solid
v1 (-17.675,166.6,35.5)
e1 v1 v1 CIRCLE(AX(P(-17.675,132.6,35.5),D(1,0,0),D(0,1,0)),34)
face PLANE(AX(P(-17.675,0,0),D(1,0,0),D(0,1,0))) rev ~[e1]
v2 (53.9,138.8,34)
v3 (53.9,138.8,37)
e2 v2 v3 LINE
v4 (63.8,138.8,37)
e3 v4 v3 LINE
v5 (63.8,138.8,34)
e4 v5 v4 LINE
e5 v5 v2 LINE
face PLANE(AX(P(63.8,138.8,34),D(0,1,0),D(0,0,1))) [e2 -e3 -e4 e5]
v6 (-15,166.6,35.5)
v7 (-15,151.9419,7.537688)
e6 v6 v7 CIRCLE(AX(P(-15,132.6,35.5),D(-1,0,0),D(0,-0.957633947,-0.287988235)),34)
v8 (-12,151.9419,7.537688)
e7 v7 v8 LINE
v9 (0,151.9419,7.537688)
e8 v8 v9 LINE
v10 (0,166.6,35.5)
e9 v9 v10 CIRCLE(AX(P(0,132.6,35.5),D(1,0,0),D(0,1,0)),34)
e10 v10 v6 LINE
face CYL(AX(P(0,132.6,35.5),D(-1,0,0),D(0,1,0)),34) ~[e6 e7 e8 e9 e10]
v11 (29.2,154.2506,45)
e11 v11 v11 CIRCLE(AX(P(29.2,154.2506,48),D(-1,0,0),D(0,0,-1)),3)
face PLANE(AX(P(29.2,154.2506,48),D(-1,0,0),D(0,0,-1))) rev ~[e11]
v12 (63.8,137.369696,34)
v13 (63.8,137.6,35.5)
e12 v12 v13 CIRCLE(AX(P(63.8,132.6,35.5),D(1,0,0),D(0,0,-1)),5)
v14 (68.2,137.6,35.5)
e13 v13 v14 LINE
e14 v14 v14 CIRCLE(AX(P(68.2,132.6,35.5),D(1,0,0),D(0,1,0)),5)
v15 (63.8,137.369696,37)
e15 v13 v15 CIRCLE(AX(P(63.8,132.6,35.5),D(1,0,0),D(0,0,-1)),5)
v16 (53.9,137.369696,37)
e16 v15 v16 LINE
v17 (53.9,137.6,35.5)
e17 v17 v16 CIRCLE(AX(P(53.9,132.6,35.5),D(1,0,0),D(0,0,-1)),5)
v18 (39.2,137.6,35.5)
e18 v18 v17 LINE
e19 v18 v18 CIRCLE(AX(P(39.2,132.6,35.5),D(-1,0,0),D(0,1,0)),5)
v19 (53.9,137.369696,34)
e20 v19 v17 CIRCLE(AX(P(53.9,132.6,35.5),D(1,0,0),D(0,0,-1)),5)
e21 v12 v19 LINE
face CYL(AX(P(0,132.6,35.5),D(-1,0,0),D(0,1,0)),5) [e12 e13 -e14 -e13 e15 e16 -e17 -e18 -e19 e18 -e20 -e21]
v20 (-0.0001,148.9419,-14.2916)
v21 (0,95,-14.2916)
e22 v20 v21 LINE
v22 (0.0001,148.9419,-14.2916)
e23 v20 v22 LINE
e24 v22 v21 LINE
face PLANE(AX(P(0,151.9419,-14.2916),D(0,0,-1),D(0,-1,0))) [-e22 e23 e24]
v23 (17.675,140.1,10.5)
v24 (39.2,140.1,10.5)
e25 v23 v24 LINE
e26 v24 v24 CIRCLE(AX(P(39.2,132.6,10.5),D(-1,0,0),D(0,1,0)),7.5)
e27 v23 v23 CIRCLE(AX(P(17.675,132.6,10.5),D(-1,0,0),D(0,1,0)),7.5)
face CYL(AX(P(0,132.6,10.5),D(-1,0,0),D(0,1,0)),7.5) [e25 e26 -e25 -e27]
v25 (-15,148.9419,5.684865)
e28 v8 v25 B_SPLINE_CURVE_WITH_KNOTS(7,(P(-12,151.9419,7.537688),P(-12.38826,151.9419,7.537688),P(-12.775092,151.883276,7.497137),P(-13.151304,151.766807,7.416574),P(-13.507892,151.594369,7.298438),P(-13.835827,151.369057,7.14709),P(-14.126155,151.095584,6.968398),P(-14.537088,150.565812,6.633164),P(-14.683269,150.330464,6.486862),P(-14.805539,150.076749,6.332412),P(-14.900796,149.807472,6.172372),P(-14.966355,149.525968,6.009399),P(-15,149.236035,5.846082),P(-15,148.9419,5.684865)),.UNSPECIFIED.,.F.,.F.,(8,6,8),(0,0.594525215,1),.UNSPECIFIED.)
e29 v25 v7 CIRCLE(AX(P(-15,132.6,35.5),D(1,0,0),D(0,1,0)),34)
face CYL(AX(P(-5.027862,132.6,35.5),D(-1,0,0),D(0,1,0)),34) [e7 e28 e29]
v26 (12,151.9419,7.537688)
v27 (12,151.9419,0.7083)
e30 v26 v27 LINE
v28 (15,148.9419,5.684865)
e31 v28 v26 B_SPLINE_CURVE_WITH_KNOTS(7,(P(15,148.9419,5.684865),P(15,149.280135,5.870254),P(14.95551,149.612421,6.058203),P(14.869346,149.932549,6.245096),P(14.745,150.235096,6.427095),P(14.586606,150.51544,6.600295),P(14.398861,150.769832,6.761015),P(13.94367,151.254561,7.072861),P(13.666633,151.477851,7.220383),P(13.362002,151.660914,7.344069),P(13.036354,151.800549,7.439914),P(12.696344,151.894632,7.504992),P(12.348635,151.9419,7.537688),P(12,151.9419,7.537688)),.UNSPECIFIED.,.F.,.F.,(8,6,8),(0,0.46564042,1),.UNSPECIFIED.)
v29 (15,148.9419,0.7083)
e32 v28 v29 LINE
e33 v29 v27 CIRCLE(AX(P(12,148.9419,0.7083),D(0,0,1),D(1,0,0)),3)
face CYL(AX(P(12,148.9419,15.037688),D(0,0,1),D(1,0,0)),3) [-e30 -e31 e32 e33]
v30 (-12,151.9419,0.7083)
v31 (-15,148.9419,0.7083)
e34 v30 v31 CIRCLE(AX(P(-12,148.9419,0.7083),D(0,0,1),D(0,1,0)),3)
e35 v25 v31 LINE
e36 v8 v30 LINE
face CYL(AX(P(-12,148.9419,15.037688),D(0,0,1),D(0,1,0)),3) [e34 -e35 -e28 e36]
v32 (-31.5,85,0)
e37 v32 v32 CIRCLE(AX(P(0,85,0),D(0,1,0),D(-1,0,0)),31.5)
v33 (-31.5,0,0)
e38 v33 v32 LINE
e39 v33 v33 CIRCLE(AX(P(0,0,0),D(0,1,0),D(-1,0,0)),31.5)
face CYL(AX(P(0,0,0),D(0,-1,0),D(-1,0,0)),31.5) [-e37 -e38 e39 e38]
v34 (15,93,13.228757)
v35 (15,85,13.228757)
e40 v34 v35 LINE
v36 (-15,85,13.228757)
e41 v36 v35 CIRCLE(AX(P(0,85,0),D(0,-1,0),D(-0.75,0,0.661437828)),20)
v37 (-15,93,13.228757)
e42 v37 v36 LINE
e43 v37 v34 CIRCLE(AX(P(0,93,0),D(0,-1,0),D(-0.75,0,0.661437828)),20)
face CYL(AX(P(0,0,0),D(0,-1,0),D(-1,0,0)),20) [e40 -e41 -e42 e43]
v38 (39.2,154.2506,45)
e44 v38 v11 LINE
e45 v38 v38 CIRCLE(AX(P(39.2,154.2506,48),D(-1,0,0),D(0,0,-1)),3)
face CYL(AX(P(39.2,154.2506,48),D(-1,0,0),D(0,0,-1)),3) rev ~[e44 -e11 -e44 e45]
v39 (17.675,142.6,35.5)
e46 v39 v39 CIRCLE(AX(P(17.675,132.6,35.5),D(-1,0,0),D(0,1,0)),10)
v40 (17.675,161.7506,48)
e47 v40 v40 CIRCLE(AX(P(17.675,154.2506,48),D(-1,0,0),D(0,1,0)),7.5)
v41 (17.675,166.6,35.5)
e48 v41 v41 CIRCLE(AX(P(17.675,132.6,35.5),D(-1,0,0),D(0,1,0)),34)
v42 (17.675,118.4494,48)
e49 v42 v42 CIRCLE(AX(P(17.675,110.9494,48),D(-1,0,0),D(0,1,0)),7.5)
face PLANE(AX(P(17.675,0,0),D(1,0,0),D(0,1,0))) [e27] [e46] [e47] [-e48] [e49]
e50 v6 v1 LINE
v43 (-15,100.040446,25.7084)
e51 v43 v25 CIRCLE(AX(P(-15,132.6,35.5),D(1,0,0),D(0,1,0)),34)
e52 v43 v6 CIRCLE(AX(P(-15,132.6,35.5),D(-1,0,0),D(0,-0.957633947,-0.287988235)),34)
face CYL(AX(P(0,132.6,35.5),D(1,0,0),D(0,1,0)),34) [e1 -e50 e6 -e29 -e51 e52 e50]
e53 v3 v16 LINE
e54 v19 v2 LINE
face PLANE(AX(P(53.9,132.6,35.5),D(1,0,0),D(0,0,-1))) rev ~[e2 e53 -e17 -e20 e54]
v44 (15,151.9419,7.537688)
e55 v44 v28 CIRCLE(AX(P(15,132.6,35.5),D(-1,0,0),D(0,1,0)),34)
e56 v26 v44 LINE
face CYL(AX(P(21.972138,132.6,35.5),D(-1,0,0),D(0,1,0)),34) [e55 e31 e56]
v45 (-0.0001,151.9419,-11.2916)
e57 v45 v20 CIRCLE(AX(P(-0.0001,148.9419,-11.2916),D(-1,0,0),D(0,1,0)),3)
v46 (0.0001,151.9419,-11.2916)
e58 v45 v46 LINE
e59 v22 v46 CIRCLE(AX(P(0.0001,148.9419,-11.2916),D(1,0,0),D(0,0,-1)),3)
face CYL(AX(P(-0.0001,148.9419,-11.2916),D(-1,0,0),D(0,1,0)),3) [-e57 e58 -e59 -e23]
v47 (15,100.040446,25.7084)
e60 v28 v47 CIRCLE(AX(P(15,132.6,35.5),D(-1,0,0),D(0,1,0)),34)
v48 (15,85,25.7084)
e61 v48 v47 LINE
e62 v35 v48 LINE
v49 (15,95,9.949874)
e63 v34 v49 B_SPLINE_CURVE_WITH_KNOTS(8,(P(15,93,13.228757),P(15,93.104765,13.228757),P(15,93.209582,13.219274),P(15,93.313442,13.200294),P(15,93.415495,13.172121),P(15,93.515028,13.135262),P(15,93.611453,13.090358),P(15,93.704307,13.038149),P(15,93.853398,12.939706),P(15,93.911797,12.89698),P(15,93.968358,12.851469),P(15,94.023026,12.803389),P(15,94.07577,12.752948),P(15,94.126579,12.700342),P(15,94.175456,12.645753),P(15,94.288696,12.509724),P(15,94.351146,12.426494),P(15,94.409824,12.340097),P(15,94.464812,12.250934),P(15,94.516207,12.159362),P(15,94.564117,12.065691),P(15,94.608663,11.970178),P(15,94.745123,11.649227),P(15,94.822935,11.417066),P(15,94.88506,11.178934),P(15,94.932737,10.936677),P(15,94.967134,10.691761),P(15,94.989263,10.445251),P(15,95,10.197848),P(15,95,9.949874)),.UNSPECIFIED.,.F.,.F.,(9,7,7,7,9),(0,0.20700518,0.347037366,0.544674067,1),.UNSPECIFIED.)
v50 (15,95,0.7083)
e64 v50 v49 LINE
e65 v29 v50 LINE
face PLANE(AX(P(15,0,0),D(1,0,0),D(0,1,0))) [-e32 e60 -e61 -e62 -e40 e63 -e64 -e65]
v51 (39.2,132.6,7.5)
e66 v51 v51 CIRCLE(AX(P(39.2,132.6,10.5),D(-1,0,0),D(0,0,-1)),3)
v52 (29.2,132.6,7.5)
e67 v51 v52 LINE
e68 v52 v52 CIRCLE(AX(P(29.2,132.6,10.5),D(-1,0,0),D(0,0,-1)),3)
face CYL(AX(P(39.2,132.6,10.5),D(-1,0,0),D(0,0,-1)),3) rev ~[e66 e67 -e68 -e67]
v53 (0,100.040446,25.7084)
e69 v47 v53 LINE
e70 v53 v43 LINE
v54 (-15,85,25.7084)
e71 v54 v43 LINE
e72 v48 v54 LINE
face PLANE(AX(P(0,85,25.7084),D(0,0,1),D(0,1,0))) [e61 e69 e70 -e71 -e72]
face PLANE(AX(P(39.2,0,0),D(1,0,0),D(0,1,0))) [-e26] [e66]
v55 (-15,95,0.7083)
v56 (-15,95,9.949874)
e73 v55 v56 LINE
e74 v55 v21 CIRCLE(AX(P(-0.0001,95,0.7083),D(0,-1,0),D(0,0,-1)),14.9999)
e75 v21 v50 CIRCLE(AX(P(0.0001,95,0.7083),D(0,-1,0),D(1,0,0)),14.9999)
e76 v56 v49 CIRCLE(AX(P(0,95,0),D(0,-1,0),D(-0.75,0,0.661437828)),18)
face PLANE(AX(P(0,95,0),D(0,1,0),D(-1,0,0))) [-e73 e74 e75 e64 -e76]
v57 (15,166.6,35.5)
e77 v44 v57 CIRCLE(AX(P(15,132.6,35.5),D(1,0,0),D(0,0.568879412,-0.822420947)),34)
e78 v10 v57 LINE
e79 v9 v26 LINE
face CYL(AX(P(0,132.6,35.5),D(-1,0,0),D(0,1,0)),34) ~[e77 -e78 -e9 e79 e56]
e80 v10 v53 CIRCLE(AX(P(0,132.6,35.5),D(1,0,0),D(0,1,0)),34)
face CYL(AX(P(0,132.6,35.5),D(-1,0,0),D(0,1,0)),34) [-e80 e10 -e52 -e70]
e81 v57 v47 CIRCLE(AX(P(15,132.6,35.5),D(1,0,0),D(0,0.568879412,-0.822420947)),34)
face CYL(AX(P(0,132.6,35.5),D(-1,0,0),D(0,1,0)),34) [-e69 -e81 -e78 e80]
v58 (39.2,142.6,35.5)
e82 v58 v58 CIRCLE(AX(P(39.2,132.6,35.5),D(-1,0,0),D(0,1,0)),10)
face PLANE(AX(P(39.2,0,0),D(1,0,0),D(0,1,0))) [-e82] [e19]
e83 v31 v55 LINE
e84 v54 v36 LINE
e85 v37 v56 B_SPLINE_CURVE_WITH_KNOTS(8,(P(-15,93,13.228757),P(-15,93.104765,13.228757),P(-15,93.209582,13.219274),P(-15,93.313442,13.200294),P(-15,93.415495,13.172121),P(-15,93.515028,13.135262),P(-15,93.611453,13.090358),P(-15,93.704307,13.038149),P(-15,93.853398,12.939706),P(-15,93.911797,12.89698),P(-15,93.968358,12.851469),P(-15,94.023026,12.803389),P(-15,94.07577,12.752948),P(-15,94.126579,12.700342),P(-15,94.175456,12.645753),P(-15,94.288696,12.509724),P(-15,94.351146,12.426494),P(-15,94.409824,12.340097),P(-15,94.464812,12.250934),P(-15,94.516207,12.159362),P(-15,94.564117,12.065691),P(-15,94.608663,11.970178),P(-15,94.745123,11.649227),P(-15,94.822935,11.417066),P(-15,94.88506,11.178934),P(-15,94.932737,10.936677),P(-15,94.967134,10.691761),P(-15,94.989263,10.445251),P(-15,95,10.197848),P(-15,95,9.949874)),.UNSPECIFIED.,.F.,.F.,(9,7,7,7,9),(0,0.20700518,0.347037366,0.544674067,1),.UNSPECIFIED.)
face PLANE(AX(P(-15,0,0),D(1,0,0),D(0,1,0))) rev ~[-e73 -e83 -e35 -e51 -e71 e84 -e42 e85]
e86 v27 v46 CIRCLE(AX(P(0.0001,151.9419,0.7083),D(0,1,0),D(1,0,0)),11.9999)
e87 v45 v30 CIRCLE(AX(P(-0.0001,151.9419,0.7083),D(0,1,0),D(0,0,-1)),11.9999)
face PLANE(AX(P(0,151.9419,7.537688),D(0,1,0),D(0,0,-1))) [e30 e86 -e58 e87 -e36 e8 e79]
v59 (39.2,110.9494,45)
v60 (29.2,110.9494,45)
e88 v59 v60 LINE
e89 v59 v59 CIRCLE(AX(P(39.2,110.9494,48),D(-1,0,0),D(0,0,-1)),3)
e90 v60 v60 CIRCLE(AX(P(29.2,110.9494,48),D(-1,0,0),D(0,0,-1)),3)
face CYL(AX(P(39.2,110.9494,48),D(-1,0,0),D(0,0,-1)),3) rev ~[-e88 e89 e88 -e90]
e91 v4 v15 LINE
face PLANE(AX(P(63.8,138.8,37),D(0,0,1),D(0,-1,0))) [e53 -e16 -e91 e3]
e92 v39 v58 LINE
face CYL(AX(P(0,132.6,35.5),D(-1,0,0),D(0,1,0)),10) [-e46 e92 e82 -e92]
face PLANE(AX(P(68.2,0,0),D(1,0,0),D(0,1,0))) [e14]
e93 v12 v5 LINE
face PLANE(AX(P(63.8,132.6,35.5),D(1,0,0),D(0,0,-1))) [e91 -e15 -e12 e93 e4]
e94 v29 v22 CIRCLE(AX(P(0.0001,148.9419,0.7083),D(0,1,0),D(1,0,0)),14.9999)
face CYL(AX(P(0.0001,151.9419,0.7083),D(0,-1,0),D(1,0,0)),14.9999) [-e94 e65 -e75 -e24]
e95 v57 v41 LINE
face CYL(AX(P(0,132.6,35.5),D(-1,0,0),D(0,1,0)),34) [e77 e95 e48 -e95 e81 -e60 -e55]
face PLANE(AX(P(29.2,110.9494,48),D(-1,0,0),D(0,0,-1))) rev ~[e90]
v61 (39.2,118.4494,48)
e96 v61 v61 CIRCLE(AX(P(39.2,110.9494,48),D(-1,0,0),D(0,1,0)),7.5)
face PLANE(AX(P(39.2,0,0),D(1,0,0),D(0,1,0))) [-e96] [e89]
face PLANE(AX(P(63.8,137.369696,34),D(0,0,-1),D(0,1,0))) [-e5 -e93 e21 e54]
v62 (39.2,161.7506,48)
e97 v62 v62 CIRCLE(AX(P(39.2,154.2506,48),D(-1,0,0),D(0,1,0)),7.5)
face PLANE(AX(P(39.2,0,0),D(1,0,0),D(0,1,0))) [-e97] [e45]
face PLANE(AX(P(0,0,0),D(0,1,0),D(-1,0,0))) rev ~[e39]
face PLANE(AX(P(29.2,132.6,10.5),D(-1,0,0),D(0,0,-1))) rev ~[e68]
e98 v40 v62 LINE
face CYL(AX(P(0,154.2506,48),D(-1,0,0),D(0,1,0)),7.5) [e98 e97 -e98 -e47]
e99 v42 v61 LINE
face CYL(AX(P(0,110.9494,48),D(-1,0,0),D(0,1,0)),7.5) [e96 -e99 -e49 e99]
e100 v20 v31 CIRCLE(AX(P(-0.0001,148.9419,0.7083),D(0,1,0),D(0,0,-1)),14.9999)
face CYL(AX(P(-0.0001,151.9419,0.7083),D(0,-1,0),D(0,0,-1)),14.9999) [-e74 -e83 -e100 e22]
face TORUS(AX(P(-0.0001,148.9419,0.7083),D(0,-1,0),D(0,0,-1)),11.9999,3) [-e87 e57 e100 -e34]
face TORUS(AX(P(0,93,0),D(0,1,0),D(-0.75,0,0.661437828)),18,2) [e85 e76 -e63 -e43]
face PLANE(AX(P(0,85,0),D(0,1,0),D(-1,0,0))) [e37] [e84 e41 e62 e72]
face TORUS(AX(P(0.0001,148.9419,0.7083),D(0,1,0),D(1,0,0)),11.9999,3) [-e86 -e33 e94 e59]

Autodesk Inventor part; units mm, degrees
ref_plane "XZ Plane" through (0, 0, 0) normal (0, 1, 0) x (-1, 0, 0)
sketch "Sketch1" plane through (0, 0, 0) normal (0, 1, 0) x (-1, 0, 0)
  circle A0 centre (0, 0) radius 31.5
  circle A1 centre (0, 0) radius 20
  dimension "d0" = 63
  dimension "d29" = 40
extrude "Extrusion1" add sketch "Sketch1" along normal blind 85 contours A0 | A1
sketch "Sketch2" plane through (0, 0, 0) normal (1, 0, 0) x (0, 1, 0)
  line L0 (0, -31.5) -> (85, -31.5) projected
  line L1 (0, -31.5) -> (0, 69.5)
  line L2 (0, 69.5) -> (166.6, 69.5)
  line L3 (166.6, 69.5) -> (166.6, 35.5)
  line L4 (166.6, 35.5) -> (132.6, 35.5)
  circle A0 centre (132.6, 35.5) radius 34
  circle A1 centre (132.6, 35.5) radius 25
  circle A2 centre (132.6, 10.5) radius 7.5
  circle A3 centre (132.6, 10.5) radius 3
  circle A4 centre (154.2506, 48) radius 7.5
  circle A5 centre (154.2506, 48) radius 3
  circle A6 centre (110.9494, 48) radius 7.5
  circle A7 centre (110.9494, 48) radius 3
  line L5 (85, -31.5) -> (85, 31.5) projected
  line L6 (85, 25.7084) -> (151.9419, 25.7084)
  line L7 (151.9419, 25.7084) -> (151.9419, -14.2916)
  line L8 (151.9419, -14.2916) -> (85, -14.2916)
  line L9 (85, -14.2916) -> (85, 25.7084)
  circle A8 centre (132.6, 35.5) radius 10
  circle A9 centre (132.6, 35.5) radius 5
  line L10 (85, 31.5) -> (85, 0)
  line L11 (85, 0) -> (100.814, 0)
  point P0 (0, 0)
  point P1 (151.9419, 7.5377)
  point P2 (134.9384, 1.5805)
  point P3 (132.6, 1.5)
  point P4 (100.0404, 25.7084)
  point P5 (92.907, 0)
  dimension "d8" = 50
  dimension "d3" = 101
  dimension "d4" = 166.6
  dimension "d5" = 34
  dimension "d6" = 34
  dimension "d7" = 68
  dimension "d9" = 15
  dimension "d10" = 6
  dimension "d13" = 360
  dimension "d21" = 20
  dimension "d22" = 10
  dimension "d26" = 40
  dimension "d49" = 69.5
  dimension "d50" = 35.5
extrude "Extrusion2" add sketch "Sketch2" along normal mid plane 30 contours L5 L6 A0 L7 L8 | A0 L4 A1 A4 A6 L6 | A0 L7 A1 L4 | L6 A1 A2 L7 A0 | A1 L7 L6 A8 L4 | L4 A8 L6 A1 A6 A4 | L6 A8 L7 A1 A2 | A8 L6 | A4 A1 A5 | A1 A5 A4 | A6 A1 A7 | A1 A7 A6 | L6 A8 | A5 A1 | A1 A5 | A7 A1 | A1 A7 | A9
extrude "Extrusion3" add sketch "Sketch2" along normal blind 39.2 contours A8 L6 | A4 A1 A5 | A1 A5 A4 | A6 A1 A7 | A1 A7 A6 | A2 A1 A3 | A1 A3 A2 | L6 A8 | A5 A1 | A1 A5 | A7 A1 | A1 A7 | A3 A1 | A1 A3 | A9
extrude "Extrusion4" add sketch "Sketch2" along normal mid plane 35.35 contours A0 L4 A1 A4 A6 L6 | A0 L7 A1 L4 | L6 A1 A2 L7 A0 | A1 L7 L6 A8 L4 | L4 A8 L6 A1 A6 A4 | L6 A8 L7 A1 A2 | A8 L6 | A4 A1 A5 | A1 A5 A4 | A6 A1 A7 | A1 A7 A6 | A2 A1 A3 | A1 A3 A2 | L6 A8 | A5 A1 | A1 A5 | A7 A1 | A1 A7 | A3 A1 | A1 A3 | A9
extrude "Extrusion5" add sketch "Sketch2" along normal blind 68.2 contours A9
ref_plane "Work Plane1" through (-31.5, 0, 0) normal (1, 0, 0) x (0, 1, 0)
fillet "Fillet1" radius 15 2 edges at (15, 118.471, -14.2916) (-15, 118.471, -14.2916)
fillet "Fillet2" radius 3 3 edges at (15, 151.9419, 4.123) (-15, 151.9419, 4.123) (10.6066, 151.9419, -9.8982)
extrude "Extrusion6" add sketch "Sketch1" along normal blind 95 contours A1
fillet "Fillet3" radius 2 1 edges at (0, 95, -20)
ref_plane "Work Plane2" through (63.8, 132.6, 35.5) normal (1, 0, 0) x (0, 0, -1)
sketch "Sketch3" plane through (39.2, 154.2506, 48) normal (1, 0, 0) x (0, 0, -1)
  circle A0 centre (0, 0) radius 3
  circle A1 centre (37.5, -21.6506) radius 7.5 projected
  circle A2 centre (37.5, -21.6506) radius 3
  circle A3 centre (0, -43.3013) radius 7.5 projected
  circle A4 centre (0, -43.3013) radius 3
  point P0 (48, -154.2506)
  dimension "d33" = 6
  dimension "d34" = 6
  dimension "d35" = 6
hole "Hole1" at (39.2, 154.2506, 48) at (39.2, 132.6, 10.5) at (39.2, 110.9494, 48) direction (-1, 0, 0) diameter 6 depth 10
sketch "Sketch4" plane through (63.8, 132.6, 35.5) normal (1, 0, 0) x (0, 0, -1)
  line L0 (-1.5, 3.8) -> (1.5, 3.8)
  line L1 (1.5, 3.8) -> (1.5, 6.2)
  line L2 (1.5, 6.2) -> (-1.5, 6.2)
  line L3 (-1.5, 6.2) -> (-1.5, 3.8)
  circle A0 centre (0, 0) radius 5 projected
  line L4 (-1.5, 3.8) -> (1.5, 6.2) construction
  line L5 (1.5, 3.8) -> (-1.5, 6.2) construction
  point P0 (35.5, -132.6)
  point P1 (0, 5)
  point P2 (-1.5, 4.7697)
  point P3 (1.5, 4.7697)
  dimension "d43" = 1.2
  dimension "d44" = 3
extrude "Extrusion7" add sketch "Sketch4" against normal blind 9.9 contours L3 L2 L1 A0
ref_plane "Work Plane3" through (0, 0, -31.5) normal (0, 0, 1) x (1, 0, 0)
properties part number "motor" material "ABS Plastic"
